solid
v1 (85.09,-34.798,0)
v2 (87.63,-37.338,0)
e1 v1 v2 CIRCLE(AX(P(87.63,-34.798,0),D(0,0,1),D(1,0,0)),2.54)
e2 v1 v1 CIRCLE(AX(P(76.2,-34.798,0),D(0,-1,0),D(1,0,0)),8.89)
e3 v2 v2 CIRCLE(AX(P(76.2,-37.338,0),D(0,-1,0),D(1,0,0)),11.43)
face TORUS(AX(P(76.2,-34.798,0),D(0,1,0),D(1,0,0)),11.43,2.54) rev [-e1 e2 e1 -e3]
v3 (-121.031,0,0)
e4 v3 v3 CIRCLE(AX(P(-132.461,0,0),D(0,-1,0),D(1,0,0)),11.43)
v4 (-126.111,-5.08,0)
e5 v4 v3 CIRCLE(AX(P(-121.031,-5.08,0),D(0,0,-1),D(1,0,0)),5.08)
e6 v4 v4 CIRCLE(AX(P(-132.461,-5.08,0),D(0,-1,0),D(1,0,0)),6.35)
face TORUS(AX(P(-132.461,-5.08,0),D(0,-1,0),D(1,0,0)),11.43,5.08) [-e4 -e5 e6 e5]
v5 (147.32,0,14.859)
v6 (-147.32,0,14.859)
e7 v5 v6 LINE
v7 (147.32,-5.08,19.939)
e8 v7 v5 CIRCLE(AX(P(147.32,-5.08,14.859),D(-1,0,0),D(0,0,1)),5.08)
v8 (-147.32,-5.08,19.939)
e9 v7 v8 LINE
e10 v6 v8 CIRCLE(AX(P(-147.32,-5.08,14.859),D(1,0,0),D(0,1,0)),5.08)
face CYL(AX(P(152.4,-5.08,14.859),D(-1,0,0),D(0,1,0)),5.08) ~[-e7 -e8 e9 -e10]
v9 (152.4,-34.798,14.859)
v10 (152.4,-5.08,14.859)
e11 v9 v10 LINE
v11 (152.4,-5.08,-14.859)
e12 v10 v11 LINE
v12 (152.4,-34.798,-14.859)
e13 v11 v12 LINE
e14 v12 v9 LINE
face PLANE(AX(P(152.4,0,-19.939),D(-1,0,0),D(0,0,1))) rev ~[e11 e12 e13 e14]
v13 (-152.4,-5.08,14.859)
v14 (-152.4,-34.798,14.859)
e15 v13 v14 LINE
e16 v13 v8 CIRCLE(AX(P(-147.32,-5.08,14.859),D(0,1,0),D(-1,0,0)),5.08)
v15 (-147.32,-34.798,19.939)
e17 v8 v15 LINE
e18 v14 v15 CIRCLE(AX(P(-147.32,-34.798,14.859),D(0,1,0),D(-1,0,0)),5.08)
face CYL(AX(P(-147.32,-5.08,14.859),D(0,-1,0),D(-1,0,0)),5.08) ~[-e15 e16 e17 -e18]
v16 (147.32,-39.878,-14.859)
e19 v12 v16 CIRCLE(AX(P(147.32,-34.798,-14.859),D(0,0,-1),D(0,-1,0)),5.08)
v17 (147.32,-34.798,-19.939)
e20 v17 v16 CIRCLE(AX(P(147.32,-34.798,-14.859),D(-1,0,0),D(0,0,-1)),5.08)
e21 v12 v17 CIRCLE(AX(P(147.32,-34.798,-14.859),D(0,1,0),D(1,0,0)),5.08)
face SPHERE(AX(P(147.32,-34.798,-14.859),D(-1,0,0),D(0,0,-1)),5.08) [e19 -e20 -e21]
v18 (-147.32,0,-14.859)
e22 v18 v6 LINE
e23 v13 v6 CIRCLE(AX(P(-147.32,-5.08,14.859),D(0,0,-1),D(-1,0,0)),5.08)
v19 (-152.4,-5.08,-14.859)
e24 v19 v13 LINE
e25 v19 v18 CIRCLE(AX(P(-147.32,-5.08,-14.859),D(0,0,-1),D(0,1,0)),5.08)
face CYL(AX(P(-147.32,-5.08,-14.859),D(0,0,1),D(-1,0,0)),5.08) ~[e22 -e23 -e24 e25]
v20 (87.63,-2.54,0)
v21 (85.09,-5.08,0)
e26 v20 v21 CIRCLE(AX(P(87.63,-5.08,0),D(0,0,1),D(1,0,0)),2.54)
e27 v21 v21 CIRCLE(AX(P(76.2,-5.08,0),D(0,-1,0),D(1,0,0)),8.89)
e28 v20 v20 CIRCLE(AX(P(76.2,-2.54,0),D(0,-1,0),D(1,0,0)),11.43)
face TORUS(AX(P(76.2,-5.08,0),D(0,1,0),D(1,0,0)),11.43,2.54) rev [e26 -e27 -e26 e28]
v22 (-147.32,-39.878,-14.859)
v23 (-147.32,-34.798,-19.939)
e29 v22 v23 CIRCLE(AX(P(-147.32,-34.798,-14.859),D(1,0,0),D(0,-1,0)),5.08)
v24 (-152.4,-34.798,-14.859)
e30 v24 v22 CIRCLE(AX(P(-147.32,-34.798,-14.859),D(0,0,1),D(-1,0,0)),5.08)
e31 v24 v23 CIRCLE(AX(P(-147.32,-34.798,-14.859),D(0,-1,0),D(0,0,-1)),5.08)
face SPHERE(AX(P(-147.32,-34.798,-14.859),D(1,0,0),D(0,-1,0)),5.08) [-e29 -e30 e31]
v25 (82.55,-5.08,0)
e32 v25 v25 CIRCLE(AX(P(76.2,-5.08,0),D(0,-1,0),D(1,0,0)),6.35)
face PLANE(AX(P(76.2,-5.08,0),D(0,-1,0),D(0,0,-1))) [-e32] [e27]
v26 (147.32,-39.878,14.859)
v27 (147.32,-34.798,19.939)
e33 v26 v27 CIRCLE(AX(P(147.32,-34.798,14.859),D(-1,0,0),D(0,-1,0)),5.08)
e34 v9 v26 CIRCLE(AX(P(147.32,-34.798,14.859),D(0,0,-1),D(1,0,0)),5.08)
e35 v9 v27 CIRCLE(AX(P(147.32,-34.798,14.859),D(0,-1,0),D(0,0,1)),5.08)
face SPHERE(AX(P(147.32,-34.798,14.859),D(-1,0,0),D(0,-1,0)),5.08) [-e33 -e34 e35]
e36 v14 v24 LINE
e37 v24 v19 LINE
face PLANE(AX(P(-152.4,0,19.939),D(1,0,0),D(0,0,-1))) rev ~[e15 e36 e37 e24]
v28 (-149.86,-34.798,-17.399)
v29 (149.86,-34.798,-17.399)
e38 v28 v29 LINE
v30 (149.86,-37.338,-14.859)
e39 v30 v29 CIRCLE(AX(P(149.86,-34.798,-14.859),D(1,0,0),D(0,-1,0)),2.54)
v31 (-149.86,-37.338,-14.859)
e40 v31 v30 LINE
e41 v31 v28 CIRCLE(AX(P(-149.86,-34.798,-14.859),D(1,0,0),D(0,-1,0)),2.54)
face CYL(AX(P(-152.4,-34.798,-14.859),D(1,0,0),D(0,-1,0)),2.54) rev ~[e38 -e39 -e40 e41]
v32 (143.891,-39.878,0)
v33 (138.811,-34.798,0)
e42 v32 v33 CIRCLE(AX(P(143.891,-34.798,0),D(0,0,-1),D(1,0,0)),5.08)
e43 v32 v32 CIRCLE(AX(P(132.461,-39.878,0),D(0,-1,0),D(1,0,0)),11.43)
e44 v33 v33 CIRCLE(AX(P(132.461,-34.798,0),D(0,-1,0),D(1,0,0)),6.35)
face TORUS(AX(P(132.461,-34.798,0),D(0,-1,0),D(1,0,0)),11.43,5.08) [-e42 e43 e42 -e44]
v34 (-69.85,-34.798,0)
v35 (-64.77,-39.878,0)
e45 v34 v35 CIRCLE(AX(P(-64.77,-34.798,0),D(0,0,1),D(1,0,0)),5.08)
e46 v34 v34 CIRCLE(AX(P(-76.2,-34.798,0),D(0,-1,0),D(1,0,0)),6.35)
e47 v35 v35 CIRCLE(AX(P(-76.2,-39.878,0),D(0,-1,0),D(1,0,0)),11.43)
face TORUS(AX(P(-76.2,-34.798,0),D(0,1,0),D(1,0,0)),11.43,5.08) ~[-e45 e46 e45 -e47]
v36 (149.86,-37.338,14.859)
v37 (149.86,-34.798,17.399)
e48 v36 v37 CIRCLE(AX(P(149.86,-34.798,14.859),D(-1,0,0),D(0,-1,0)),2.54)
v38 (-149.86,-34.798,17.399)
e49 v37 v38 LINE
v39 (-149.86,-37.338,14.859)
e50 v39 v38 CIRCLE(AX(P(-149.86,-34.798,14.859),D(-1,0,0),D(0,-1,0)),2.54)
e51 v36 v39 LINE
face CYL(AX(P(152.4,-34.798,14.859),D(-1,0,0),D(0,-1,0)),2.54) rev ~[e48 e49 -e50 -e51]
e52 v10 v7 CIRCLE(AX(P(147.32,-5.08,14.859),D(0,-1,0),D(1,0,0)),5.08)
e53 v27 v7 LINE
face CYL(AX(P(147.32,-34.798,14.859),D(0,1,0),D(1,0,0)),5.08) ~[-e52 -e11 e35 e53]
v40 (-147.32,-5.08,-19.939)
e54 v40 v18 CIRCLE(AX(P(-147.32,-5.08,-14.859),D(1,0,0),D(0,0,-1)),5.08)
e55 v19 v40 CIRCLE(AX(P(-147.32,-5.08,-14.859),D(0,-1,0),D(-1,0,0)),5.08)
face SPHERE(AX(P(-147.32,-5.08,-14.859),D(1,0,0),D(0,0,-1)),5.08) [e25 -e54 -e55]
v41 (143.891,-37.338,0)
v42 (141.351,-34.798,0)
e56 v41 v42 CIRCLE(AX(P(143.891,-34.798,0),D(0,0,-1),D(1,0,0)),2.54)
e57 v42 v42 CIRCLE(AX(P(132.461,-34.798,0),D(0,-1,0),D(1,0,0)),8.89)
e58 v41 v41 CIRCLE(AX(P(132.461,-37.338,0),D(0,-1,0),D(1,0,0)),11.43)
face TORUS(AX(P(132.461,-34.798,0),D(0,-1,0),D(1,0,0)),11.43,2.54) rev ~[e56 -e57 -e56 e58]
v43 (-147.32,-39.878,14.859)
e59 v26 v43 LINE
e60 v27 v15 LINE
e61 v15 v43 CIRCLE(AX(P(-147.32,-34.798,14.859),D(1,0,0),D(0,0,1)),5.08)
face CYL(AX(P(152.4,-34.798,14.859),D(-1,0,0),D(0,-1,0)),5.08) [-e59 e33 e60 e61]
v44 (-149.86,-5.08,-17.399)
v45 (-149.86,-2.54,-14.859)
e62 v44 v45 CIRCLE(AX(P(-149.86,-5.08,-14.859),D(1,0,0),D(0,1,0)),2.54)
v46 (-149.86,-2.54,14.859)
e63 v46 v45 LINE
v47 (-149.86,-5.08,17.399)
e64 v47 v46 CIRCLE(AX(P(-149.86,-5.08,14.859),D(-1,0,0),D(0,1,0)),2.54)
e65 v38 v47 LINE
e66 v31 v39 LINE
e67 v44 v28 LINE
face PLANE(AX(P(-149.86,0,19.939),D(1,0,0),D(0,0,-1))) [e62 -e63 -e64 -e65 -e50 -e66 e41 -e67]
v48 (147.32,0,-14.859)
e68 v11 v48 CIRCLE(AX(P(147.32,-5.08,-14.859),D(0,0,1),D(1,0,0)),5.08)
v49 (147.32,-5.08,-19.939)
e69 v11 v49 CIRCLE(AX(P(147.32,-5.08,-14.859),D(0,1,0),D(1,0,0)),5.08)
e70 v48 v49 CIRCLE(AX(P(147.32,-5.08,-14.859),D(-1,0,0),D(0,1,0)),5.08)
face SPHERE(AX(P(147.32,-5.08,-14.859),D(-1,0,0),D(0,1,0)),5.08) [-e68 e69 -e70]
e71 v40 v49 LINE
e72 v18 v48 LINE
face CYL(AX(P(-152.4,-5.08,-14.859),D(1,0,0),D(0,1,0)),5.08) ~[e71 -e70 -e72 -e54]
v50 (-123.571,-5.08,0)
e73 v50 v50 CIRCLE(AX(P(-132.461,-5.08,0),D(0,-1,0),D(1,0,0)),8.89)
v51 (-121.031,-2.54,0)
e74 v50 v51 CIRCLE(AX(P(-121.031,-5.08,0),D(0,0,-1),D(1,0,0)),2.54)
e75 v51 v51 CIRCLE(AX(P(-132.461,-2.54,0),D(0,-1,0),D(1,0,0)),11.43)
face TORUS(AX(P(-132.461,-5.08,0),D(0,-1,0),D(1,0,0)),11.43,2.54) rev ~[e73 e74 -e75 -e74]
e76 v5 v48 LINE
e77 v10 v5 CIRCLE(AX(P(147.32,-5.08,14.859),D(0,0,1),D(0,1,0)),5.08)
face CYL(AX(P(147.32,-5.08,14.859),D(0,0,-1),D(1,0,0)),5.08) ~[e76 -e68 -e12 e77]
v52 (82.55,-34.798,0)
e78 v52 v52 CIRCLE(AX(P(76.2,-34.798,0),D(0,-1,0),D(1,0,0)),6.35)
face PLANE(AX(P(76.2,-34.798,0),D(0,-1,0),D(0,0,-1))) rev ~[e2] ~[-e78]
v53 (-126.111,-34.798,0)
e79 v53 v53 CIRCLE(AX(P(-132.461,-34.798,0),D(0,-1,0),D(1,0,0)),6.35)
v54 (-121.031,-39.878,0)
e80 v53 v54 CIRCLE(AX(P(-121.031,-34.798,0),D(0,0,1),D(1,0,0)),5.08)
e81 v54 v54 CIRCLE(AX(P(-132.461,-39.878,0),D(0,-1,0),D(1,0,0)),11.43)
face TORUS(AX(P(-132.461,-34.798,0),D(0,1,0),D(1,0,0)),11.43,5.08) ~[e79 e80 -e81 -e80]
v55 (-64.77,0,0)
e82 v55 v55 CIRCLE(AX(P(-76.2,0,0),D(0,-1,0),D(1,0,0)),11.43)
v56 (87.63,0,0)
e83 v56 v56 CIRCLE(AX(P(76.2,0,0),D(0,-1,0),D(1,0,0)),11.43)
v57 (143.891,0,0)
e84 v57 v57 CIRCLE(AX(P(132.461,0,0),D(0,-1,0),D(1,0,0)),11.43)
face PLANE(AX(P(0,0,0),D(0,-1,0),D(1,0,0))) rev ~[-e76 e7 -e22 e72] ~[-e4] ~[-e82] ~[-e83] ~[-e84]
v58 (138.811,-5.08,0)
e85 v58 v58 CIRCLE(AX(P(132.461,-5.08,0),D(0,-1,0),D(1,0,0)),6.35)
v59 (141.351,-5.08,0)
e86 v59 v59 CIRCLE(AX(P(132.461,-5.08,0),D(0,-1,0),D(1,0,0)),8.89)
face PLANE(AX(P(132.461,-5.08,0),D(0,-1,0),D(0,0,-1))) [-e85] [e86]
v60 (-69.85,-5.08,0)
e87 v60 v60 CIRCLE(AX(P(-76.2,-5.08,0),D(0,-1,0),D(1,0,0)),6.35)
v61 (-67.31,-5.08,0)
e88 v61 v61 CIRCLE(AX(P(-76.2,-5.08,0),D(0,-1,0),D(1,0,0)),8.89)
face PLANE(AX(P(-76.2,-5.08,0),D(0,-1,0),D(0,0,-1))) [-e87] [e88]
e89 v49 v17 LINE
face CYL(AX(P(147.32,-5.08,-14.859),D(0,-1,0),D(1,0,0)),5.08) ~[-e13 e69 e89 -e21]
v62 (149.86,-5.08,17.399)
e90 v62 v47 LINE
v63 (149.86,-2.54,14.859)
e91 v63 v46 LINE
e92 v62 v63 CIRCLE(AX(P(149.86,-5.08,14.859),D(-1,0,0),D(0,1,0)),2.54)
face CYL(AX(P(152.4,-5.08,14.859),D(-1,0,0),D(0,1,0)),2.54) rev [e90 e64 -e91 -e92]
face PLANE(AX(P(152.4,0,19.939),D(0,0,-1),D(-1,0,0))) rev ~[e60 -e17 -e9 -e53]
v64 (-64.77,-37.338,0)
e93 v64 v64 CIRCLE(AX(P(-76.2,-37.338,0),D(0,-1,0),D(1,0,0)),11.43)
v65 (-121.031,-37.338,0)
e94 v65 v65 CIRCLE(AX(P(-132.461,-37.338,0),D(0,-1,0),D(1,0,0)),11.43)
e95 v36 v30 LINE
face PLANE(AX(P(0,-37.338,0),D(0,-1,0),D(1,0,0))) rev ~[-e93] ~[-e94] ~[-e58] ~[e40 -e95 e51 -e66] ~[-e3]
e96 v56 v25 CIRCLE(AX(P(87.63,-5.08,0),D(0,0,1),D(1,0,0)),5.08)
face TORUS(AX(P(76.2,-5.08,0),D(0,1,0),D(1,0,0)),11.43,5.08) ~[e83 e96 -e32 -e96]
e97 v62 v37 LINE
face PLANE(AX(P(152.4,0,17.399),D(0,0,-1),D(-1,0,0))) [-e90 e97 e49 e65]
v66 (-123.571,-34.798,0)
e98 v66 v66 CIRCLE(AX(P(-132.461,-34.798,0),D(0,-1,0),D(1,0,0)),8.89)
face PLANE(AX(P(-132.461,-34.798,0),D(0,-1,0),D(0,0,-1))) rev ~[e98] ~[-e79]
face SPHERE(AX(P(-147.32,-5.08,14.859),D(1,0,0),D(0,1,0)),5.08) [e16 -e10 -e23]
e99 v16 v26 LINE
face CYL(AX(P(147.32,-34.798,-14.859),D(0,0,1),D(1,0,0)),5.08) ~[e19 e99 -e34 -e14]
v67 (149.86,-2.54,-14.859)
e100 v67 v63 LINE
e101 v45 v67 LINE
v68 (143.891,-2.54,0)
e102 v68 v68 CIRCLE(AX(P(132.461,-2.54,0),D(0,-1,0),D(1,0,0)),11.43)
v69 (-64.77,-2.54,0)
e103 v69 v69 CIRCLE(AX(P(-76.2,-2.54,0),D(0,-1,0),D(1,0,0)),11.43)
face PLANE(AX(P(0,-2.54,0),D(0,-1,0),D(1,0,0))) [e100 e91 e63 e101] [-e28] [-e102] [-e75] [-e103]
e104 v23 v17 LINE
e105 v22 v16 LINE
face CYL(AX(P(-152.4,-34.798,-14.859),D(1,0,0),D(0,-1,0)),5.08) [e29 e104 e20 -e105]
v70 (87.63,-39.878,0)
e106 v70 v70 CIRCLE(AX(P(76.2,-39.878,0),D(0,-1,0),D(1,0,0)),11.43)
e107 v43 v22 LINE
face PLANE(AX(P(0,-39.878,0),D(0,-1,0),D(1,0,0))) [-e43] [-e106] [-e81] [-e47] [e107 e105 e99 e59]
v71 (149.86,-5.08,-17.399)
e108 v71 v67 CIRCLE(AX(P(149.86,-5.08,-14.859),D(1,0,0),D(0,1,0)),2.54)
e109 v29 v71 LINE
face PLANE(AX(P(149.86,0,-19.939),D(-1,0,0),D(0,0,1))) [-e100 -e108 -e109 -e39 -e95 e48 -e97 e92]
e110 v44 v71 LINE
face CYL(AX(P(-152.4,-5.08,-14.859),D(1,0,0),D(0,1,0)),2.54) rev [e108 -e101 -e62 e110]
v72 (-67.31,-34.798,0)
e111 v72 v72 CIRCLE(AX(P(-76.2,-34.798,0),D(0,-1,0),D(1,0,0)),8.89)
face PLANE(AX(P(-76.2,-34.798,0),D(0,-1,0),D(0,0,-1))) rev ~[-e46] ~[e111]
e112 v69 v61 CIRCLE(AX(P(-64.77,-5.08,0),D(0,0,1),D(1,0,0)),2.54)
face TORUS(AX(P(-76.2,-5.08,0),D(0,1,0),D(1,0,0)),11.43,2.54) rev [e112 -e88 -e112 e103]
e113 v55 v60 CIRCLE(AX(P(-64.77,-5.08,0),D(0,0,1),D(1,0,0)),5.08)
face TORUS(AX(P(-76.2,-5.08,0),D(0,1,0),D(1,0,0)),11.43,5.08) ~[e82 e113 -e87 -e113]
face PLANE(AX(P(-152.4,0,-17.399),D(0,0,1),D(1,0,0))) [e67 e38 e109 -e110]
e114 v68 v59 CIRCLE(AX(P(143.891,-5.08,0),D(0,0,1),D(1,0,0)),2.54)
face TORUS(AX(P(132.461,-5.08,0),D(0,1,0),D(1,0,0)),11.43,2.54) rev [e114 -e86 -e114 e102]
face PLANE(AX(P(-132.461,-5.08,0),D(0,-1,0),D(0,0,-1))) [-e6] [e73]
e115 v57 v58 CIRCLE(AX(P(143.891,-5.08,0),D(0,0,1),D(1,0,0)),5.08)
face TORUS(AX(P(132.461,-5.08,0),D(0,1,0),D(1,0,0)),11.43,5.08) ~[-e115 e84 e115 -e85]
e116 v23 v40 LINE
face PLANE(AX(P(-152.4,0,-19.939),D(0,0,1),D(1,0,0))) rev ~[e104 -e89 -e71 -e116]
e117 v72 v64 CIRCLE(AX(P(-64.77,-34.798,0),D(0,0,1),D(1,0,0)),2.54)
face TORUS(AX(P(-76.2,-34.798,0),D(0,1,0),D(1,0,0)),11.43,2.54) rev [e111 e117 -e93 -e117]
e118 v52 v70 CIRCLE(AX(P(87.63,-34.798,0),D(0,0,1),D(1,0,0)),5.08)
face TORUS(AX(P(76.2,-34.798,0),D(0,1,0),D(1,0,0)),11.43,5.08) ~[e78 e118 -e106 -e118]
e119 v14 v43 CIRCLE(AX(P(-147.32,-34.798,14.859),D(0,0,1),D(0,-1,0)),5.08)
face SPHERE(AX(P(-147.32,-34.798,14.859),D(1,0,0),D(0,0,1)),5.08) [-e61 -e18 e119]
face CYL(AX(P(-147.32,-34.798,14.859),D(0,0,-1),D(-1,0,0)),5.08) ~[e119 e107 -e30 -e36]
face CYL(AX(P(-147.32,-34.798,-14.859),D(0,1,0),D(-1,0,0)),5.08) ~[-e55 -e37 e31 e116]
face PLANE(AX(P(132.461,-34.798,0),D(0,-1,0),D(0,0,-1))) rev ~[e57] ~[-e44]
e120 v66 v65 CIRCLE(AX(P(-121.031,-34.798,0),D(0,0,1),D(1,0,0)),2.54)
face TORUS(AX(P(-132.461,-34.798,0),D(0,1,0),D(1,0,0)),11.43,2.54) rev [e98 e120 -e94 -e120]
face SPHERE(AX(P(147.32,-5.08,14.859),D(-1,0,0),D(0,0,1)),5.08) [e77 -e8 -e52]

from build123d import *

# Parameters (mm, degrees)
F0_R     = 6.35
F1_DEPTH = 39.878
F2_R     = 5.08
F3_R     = 5.08
F4_T     = 2.54
F5_R     = 5.08


# Not quite as in the source:
# - a shell that OpenCascade refuses in one call is made with other operations: the cavity is built on its own and cut out


with BuildPart() as f1:
    # F0 (on Front) → F1 (new body)
    with BuildSketch(Plane.XZ):
        Polygon((-112.522, -19.939), (152.4, -19.939), (152.4, 19.939), (76.2, 19.939), (0, 19.939), (-76.2, 19.939), (-112.522, 19.939), (-152.4, 19.939), (-152.4, -19.939), align=None)
        with Locations((-132.461, 0)):
            Circle(F0_R, mode=Mode.SUBTRACT)
        with Locations((-76.2, 0)):
            Circle(F0_R, mode=Mode.SUBTRACT)
        with Locations((76.2, 0)):
            Circle(F0_R, mode=Mode.SUBTRACT)
        with Locations((132.461, 0)):
            Circle(F0_R, mode=Mode.SUBTRACT)
    extrude(amount=F1_DEPTH)

    # F2
    f2_edges = [f1.edges().sort_by_distance(p)[0] for p in [
        (-138.811, -39.878, 0),
        (-82.55, -39.878, 0),
        (69.85, -39.878, 0),
    ]]
    fillet(f2_edges, radius=F2_R)

    # F3
    f3_edges = [f1.edges().sort_by_distance(p)[0] for p in [
        (126.111, -39.878, 0),
        (126.111, 0, 0),
        (69.85, 0, 0),
        (-82.55, 0, 0),
        (-138.811, 0, 0),
        (0, 0, -19.939),
        (0, 0, 19.939),
        (0, -39.878, 19.939),
        (0, -39.878, -19.939),
    ]]
    fillet(f3_edges, radius=F3_R)

    # F4: shell of thickness 2.54, made by hand


with BuildPart() as f4_core1:
    # F4_t2: copy of F1
    add(f1.part)

    # the walls: a layer under each face that stays
    f4_faces = [f4_core1.faces().sort_by_distance(p)[0] for p in [
        (0, -39.878, 0),
        (152.4, -19.939, 0),
        (0, -38.3901024484, -18.4511024484),
        (0, -38.3901024484, 18.4511024484),
        (-152.4, -19.939, 0),
        (-140.2988975516, -38.3901024484, 0),
        (-84.0378975516, -38.3901024484, 0),
        (68.3621024484, -38.3901024484, 0),
        (124.6231024484, -38.3901024484, 0),
        (0, -19.939, -19.939),
        (0, -1.4878975516, -18.4511024484),
        (0, 0, 0),
        (0, -1.4878975516, 18.4511024484),
        (0, -19.939, 19.939),
        (124.6231024484, -1.4878975516, 0),
        (68.3621024484, -1.4878975516, 0),
        (-84.0378975516, -1.4878975516, 0),
        (-140.2988975516, -1.4878975516, 0),
    ]]
    thicken(f4_faces, amount=-F4_T, mode=Mode.SUBTRACT)


with BuildPart() as f1_1:
    add(f1.part)

    # what is left inside the walls is the cavity
    f4_cavity = [f4_core1.part.solids().sort_by_distance(p)[0] for p in [
        (0, -24.892, -17.3736),
    ]]
    add(f4_cavity, mode=Mode.SUBTRACT)

    # F5
    f5_edges = [f1_1.edges().sort_by_distance(p)[0] for p in [
        (-152.4, -19.939, 19.939),
        (152.4, -19.939, -19.939),
        (152.4, -1.487898, -18.451102),
        (152.4, -38.390102, -18.451102),
        (152.4, 0, 0),
        (152.4, -39.878, 0),
        (152.4, -1.487898, 18.451102),
        (152.4, -38.390102, 18.451102),
        (152.4, -19.939, 19.939),
    ]]
    fillet(f5_edges, radius=F5_R)


solid = f1_1.part
